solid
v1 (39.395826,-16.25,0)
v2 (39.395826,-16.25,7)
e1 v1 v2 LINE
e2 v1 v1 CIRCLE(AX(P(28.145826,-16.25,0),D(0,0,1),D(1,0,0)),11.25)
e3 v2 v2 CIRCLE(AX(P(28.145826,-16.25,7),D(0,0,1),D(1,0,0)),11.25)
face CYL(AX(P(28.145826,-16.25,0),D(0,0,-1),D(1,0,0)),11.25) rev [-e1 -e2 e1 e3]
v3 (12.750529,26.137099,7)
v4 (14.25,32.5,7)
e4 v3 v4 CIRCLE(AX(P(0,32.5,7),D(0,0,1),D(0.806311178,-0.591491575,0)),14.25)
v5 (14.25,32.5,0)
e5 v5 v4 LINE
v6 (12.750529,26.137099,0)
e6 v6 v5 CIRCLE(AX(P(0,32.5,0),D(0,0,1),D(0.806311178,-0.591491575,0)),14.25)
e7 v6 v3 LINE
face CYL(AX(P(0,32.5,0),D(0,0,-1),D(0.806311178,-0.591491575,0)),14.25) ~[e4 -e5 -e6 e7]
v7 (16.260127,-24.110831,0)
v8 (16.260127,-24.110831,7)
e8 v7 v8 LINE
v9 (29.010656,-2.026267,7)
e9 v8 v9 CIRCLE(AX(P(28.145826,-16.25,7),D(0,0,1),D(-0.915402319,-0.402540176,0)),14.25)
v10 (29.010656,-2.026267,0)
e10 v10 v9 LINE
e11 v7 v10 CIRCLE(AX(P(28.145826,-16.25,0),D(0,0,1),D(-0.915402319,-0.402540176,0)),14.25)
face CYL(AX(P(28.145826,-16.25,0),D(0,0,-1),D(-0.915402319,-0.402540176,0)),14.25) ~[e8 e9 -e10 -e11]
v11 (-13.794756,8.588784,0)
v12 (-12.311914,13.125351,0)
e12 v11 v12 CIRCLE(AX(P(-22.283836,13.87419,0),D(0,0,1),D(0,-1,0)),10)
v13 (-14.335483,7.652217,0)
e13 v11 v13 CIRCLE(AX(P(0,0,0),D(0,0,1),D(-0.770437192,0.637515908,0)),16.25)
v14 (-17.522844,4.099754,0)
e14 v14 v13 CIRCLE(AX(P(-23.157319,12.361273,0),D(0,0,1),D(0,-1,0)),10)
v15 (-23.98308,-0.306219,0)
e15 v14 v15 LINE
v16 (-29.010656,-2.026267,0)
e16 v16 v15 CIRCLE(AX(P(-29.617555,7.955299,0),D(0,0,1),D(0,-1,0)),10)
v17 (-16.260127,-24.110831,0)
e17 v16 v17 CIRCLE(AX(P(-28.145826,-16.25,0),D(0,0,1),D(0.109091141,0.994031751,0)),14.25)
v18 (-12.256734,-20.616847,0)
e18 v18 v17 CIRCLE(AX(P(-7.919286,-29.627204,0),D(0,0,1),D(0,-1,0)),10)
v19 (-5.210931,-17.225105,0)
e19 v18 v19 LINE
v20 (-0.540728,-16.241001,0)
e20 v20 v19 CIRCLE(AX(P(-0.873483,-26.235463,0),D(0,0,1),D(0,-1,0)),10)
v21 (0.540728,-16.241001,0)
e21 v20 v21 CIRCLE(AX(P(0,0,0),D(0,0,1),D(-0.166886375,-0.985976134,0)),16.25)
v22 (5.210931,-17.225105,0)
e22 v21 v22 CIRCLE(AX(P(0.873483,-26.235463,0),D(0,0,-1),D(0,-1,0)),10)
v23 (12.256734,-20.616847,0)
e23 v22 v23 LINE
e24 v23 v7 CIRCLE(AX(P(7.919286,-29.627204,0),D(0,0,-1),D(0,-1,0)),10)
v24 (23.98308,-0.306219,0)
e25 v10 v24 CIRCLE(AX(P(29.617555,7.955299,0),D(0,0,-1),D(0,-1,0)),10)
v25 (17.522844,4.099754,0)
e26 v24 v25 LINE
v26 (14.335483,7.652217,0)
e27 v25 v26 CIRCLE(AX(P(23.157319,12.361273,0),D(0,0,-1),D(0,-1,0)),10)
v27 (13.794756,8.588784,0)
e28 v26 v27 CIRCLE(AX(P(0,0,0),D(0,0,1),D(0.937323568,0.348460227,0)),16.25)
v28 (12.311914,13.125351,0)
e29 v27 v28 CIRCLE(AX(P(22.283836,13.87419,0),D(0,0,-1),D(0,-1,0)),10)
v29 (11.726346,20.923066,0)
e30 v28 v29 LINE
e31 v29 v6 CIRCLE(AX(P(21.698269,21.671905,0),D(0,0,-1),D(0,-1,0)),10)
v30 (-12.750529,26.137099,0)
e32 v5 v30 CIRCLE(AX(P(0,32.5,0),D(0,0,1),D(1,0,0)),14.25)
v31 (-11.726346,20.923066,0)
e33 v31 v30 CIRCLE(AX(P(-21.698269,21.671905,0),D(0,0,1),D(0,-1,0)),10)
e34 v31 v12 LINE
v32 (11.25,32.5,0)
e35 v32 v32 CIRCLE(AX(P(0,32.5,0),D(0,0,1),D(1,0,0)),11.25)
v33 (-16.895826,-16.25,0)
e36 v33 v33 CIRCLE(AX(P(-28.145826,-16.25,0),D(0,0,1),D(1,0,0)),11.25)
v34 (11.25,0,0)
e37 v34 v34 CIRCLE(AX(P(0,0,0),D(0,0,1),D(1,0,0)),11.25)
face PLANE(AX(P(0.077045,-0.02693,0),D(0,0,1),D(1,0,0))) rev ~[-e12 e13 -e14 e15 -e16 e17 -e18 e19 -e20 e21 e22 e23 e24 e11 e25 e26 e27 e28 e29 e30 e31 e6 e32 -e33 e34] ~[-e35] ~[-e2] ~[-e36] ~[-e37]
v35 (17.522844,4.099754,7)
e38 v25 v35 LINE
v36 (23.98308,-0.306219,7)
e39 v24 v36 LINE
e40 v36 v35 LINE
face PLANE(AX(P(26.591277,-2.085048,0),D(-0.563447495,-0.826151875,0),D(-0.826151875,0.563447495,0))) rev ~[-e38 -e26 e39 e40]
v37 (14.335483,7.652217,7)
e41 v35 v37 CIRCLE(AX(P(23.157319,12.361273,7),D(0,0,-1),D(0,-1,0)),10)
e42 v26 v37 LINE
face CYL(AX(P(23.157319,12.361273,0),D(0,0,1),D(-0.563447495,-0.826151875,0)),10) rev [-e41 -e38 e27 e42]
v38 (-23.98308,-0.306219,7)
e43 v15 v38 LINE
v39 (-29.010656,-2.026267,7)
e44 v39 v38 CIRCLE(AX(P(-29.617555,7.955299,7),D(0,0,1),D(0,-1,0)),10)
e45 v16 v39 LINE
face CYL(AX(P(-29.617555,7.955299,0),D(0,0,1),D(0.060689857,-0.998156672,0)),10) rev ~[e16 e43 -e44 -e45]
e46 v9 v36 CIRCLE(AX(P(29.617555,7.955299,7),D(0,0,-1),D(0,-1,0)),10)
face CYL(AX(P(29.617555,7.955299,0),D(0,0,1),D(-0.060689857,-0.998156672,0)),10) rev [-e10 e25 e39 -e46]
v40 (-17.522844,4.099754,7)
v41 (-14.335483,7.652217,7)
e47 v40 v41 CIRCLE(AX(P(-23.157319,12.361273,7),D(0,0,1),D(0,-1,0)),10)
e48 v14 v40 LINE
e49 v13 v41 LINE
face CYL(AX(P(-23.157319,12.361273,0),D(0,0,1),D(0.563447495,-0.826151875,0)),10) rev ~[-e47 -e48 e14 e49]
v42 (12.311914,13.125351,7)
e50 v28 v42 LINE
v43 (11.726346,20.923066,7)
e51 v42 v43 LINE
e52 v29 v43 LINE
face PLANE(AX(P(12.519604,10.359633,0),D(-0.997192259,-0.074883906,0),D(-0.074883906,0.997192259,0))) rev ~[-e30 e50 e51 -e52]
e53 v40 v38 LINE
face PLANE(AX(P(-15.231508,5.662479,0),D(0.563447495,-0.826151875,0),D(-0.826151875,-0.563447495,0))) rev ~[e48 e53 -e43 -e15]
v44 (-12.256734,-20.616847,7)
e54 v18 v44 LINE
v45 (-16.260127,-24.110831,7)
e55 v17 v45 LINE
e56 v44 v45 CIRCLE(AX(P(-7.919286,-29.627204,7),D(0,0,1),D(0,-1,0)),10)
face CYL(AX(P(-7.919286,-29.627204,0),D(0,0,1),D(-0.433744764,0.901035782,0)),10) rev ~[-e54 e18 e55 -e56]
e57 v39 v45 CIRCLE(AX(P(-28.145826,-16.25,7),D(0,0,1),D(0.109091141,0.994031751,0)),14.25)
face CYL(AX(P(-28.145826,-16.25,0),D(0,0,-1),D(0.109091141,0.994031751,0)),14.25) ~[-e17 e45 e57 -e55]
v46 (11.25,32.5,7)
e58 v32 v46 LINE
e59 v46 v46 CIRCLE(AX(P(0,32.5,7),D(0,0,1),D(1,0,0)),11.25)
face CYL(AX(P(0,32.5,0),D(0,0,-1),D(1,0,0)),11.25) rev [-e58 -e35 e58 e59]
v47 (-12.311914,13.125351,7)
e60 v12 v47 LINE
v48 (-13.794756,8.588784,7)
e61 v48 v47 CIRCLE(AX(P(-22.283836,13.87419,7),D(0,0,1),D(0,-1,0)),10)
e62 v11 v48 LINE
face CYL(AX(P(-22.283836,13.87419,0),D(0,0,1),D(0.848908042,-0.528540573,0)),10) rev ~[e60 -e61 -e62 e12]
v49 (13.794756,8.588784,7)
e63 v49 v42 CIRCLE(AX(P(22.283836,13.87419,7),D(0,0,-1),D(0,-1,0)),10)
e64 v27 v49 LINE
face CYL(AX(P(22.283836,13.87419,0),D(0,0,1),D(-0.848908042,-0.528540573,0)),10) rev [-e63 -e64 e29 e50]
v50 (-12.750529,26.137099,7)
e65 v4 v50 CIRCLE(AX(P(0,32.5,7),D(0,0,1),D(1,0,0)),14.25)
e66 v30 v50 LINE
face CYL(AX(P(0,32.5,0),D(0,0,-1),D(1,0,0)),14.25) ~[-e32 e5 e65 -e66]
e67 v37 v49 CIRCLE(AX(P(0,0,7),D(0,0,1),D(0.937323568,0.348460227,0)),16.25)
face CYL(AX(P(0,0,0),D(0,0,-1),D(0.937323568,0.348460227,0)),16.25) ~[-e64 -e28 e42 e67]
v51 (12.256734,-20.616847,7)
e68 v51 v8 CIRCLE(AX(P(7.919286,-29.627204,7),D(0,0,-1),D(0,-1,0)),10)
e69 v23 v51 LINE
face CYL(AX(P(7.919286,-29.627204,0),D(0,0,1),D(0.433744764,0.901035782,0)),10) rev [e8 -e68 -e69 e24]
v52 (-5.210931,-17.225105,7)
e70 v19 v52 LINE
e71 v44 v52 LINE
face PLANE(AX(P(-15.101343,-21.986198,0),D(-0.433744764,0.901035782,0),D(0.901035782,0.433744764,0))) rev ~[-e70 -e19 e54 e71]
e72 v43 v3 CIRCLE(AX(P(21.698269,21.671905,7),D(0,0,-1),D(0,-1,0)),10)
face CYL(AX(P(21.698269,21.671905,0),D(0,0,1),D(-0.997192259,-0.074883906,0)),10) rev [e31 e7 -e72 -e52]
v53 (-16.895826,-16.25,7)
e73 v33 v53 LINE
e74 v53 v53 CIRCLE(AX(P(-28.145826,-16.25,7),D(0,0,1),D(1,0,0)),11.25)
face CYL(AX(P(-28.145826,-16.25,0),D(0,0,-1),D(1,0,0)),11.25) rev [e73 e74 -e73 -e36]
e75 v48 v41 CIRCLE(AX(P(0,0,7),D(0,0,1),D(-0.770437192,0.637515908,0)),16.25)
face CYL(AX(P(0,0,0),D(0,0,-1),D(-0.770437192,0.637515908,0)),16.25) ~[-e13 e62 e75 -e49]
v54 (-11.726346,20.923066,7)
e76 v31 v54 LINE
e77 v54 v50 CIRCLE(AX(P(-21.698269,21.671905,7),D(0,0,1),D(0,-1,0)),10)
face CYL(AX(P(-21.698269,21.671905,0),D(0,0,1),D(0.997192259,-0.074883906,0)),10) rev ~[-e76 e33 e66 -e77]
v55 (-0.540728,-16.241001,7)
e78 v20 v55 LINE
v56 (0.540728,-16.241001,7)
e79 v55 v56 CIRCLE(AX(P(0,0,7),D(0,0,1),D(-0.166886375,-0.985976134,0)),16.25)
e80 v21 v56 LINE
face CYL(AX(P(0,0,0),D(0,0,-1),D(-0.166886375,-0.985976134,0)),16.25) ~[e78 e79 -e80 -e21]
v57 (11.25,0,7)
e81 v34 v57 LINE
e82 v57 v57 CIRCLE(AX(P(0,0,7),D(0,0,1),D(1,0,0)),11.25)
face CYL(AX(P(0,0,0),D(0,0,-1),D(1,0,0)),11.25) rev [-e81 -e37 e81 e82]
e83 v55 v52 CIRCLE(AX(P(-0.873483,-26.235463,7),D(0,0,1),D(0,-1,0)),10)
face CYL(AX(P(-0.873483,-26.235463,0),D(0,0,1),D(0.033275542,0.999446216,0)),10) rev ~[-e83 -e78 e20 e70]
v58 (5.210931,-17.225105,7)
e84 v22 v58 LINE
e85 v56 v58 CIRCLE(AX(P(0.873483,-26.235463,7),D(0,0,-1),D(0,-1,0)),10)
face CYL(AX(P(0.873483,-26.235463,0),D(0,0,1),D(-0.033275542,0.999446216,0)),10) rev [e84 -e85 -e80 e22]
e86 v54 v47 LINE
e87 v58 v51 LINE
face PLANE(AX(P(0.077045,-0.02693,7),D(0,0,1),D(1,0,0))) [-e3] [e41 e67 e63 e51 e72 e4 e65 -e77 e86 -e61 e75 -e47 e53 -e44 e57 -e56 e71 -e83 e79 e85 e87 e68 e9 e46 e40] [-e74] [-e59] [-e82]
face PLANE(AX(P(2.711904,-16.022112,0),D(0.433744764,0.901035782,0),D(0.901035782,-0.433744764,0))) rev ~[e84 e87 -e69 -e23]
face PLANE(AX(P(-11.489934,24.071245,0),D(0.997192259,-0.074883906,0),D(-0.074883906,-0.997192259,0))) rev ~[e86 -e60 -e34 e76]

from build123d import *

# Parameters (mm, degrees)
F0_R     = 11.25
F1_DEPTH = 7
F2_R     = 10


# Not quite as in the source:
# - a feature names something its author has since deleted; it is built from what else it names


with BuildPart() as f1:
    # F0 (on Top) → F1 (new body)
    with BuildSketch(Plane.XY):
        with BuildLine():
            ThreePointArc((2.7119035956, -16.0221121856), (12.4123110948, -10.4879470482), (16.25, 0))
            ThreePointArc((16.25, 0), (15.9933502519, 2.8766730299), (15.2315079728, 5.6624786864))
            ThreePointArc((15.2315079728, 5.6624786864), (14.0729128115, 8.125), (12.5196043772, 10.3596334992))
            ThreePointArc((12.5196043772, 10.3596334992), (0, 16.25), (-12.5196043772, 10.3596334992))
            ThreePointArc((-12.5196043772, 10.3596334992), (-14.0729128115, 8.125), (-15.2315079728, 5.6624786864))
            ThreePointArc((-15.2315079728, 5.6624786864), (-14.0729128115, -8.125), (-2.7119035956, -16.0221121856))
            ThreePointArc((-2.7119035956, -16.0221121856), (0, -16.25), (2.7119035956, -16.0221121856))
        make_face()
        Circle(F0_R, mode=Mode.SUBTRACT)
        with BuildLine():
            ThreePointArc((15.2315079728, 5.6624786864), (15.9933502519, 2.8766730299), (16.25, 0))
            ThreePointArc((16.25, 0), (12.4123110948, -10.4879470482), (2.7119035956, -16.0221121856))
            Line((2.7119035956, -16.0221121856), (15.101342571, -21.9861975129))
            ThreePointArc((15.101342571, -21.9861975129), (15.8049636191, -9.125), (26.5912768643, -2.0850475413))
            Line((26.5912768643, -2.0850475413), (15.2315079728, 5.6624786864))
        make_face()
        with BuildLine():
            ThreePointArc((-12.5196043772, 10.3596334992), (0, 16.25), (12.5196043772, 10.3596334992))
            Line((12.5196043772, 10.3596334992), (11.4899342932, 24.0712450542))
            ThreePointArc((11.4899342932, 24.0712450542), (0, 18.25), (-11.4899342932, 24.0712450542))
            Line((-11.4899342932, 24.0712450542), (-12.5196043772, 10.3596334992))
        make_face()
        with BuildLine():
            ThreePointArc((42.395825623, -16.25), (37.6566137131, -5.6383361387), (26.5912768643, -2.0850475413))
            ThreePointArc((26.5912768643, -2.0850475413), (15.8049636191, -9.125), (15.101342571, -21.9861975129))
            ThreePointArc((15.101342571, -21.9861975129), (31.0765777883, -30.1953645254), (42.395825623, -16.25))
        make_face()
        with Locations((28.145825623, -16.25)):
            Circle(F0_R, mode=Mode.SUBTRACT)
        with BuildLine():
            Line((-15.101342571, -21.9861975129), (-2.7119035956, -16.0221121856))
            ThreePointArc((-2.7119035956, -16.0221121856), (-14.0729128115, -8.125), (-15.2315079728, 5.6624786864))
            Line((-15.2315079728, 5.6624786864), (-26.5912768643, -2.0850475413))
            ThreePointArc((-26.5912768643, -2.0850475413), (-17.5341617617, -6.7392119099), (-13.895825623, -16.25))
            ThreePointArc((-13.895825623, -16.25), (-14.2004610976, -19.1807521653), (-15.101342571, -21.9861975129))
        make_face()
        with BuildLine():
            ThreePointArc((-11.4899342932, 24.0712450542), (0, 18.25), (11.4899342932, 24.0712450542))
            ThreePointArc((11.4899342932, 24.0712450542), (13.5424160267, 28.0654235647), (14.25, 32.5))
            ThreePointArc((14.25, 32.5), (-4.4345764353, 46.0424160267), (-11.4899342932, 24.0712450542))
        make_face()
        with Locations((0, 32.5)):
            Circle(F0_R, mode=Mode.SUBTRACT)
        with BuildLine():
            ThreePointArc((-26.5912768643, -2.0850475413), (-40.4866876269, -23.375), (-15.101342571, -21.9861975129))
            ThreePointArc((-15.101342571, -21.9861975129), (-14.2004610976, -19.1807521653), (-13.895825623, -16.25))
            ThreePointArc((-13.895825623, -16.25), (-17.5341617617, -6.7392119099), (-26.5912768643, -2.0850475413))
        make_face()
        with Locations((-28.145825623, -16.25)):
            Circle(F0_R, mode=Mode.SUBTRACT)
    extrude(amount=F1_DEPTH)

    # F2
    f2_edges = [f1.edges().sort_by_distance(p)[0] for p in [
        (-11.489934, 24.071245, 3.5),
        (-12.519604, 10.359633, 3.5),
        (-15.231508, 5.662479, 3.5),
        (-26.591277, -2.085048, 3.5),
        (2.711904, -16.022112, 3.5),
        (-2.711904, -16.022112, 3.5),
        (15.101343, -21.986198, 3.5),
        (-15.101343, -21.986198, 3.5),
        (26.591277, -2.085048, 3.5),
        (15.231508, 5.662479, 3.5),
        (12.519604, 10.359633, 3.5),
        (11.489934, 24.071245, 3.5),
    ]]
    fillet(f2_edges, radius=F2_R)


solid = f1.part
